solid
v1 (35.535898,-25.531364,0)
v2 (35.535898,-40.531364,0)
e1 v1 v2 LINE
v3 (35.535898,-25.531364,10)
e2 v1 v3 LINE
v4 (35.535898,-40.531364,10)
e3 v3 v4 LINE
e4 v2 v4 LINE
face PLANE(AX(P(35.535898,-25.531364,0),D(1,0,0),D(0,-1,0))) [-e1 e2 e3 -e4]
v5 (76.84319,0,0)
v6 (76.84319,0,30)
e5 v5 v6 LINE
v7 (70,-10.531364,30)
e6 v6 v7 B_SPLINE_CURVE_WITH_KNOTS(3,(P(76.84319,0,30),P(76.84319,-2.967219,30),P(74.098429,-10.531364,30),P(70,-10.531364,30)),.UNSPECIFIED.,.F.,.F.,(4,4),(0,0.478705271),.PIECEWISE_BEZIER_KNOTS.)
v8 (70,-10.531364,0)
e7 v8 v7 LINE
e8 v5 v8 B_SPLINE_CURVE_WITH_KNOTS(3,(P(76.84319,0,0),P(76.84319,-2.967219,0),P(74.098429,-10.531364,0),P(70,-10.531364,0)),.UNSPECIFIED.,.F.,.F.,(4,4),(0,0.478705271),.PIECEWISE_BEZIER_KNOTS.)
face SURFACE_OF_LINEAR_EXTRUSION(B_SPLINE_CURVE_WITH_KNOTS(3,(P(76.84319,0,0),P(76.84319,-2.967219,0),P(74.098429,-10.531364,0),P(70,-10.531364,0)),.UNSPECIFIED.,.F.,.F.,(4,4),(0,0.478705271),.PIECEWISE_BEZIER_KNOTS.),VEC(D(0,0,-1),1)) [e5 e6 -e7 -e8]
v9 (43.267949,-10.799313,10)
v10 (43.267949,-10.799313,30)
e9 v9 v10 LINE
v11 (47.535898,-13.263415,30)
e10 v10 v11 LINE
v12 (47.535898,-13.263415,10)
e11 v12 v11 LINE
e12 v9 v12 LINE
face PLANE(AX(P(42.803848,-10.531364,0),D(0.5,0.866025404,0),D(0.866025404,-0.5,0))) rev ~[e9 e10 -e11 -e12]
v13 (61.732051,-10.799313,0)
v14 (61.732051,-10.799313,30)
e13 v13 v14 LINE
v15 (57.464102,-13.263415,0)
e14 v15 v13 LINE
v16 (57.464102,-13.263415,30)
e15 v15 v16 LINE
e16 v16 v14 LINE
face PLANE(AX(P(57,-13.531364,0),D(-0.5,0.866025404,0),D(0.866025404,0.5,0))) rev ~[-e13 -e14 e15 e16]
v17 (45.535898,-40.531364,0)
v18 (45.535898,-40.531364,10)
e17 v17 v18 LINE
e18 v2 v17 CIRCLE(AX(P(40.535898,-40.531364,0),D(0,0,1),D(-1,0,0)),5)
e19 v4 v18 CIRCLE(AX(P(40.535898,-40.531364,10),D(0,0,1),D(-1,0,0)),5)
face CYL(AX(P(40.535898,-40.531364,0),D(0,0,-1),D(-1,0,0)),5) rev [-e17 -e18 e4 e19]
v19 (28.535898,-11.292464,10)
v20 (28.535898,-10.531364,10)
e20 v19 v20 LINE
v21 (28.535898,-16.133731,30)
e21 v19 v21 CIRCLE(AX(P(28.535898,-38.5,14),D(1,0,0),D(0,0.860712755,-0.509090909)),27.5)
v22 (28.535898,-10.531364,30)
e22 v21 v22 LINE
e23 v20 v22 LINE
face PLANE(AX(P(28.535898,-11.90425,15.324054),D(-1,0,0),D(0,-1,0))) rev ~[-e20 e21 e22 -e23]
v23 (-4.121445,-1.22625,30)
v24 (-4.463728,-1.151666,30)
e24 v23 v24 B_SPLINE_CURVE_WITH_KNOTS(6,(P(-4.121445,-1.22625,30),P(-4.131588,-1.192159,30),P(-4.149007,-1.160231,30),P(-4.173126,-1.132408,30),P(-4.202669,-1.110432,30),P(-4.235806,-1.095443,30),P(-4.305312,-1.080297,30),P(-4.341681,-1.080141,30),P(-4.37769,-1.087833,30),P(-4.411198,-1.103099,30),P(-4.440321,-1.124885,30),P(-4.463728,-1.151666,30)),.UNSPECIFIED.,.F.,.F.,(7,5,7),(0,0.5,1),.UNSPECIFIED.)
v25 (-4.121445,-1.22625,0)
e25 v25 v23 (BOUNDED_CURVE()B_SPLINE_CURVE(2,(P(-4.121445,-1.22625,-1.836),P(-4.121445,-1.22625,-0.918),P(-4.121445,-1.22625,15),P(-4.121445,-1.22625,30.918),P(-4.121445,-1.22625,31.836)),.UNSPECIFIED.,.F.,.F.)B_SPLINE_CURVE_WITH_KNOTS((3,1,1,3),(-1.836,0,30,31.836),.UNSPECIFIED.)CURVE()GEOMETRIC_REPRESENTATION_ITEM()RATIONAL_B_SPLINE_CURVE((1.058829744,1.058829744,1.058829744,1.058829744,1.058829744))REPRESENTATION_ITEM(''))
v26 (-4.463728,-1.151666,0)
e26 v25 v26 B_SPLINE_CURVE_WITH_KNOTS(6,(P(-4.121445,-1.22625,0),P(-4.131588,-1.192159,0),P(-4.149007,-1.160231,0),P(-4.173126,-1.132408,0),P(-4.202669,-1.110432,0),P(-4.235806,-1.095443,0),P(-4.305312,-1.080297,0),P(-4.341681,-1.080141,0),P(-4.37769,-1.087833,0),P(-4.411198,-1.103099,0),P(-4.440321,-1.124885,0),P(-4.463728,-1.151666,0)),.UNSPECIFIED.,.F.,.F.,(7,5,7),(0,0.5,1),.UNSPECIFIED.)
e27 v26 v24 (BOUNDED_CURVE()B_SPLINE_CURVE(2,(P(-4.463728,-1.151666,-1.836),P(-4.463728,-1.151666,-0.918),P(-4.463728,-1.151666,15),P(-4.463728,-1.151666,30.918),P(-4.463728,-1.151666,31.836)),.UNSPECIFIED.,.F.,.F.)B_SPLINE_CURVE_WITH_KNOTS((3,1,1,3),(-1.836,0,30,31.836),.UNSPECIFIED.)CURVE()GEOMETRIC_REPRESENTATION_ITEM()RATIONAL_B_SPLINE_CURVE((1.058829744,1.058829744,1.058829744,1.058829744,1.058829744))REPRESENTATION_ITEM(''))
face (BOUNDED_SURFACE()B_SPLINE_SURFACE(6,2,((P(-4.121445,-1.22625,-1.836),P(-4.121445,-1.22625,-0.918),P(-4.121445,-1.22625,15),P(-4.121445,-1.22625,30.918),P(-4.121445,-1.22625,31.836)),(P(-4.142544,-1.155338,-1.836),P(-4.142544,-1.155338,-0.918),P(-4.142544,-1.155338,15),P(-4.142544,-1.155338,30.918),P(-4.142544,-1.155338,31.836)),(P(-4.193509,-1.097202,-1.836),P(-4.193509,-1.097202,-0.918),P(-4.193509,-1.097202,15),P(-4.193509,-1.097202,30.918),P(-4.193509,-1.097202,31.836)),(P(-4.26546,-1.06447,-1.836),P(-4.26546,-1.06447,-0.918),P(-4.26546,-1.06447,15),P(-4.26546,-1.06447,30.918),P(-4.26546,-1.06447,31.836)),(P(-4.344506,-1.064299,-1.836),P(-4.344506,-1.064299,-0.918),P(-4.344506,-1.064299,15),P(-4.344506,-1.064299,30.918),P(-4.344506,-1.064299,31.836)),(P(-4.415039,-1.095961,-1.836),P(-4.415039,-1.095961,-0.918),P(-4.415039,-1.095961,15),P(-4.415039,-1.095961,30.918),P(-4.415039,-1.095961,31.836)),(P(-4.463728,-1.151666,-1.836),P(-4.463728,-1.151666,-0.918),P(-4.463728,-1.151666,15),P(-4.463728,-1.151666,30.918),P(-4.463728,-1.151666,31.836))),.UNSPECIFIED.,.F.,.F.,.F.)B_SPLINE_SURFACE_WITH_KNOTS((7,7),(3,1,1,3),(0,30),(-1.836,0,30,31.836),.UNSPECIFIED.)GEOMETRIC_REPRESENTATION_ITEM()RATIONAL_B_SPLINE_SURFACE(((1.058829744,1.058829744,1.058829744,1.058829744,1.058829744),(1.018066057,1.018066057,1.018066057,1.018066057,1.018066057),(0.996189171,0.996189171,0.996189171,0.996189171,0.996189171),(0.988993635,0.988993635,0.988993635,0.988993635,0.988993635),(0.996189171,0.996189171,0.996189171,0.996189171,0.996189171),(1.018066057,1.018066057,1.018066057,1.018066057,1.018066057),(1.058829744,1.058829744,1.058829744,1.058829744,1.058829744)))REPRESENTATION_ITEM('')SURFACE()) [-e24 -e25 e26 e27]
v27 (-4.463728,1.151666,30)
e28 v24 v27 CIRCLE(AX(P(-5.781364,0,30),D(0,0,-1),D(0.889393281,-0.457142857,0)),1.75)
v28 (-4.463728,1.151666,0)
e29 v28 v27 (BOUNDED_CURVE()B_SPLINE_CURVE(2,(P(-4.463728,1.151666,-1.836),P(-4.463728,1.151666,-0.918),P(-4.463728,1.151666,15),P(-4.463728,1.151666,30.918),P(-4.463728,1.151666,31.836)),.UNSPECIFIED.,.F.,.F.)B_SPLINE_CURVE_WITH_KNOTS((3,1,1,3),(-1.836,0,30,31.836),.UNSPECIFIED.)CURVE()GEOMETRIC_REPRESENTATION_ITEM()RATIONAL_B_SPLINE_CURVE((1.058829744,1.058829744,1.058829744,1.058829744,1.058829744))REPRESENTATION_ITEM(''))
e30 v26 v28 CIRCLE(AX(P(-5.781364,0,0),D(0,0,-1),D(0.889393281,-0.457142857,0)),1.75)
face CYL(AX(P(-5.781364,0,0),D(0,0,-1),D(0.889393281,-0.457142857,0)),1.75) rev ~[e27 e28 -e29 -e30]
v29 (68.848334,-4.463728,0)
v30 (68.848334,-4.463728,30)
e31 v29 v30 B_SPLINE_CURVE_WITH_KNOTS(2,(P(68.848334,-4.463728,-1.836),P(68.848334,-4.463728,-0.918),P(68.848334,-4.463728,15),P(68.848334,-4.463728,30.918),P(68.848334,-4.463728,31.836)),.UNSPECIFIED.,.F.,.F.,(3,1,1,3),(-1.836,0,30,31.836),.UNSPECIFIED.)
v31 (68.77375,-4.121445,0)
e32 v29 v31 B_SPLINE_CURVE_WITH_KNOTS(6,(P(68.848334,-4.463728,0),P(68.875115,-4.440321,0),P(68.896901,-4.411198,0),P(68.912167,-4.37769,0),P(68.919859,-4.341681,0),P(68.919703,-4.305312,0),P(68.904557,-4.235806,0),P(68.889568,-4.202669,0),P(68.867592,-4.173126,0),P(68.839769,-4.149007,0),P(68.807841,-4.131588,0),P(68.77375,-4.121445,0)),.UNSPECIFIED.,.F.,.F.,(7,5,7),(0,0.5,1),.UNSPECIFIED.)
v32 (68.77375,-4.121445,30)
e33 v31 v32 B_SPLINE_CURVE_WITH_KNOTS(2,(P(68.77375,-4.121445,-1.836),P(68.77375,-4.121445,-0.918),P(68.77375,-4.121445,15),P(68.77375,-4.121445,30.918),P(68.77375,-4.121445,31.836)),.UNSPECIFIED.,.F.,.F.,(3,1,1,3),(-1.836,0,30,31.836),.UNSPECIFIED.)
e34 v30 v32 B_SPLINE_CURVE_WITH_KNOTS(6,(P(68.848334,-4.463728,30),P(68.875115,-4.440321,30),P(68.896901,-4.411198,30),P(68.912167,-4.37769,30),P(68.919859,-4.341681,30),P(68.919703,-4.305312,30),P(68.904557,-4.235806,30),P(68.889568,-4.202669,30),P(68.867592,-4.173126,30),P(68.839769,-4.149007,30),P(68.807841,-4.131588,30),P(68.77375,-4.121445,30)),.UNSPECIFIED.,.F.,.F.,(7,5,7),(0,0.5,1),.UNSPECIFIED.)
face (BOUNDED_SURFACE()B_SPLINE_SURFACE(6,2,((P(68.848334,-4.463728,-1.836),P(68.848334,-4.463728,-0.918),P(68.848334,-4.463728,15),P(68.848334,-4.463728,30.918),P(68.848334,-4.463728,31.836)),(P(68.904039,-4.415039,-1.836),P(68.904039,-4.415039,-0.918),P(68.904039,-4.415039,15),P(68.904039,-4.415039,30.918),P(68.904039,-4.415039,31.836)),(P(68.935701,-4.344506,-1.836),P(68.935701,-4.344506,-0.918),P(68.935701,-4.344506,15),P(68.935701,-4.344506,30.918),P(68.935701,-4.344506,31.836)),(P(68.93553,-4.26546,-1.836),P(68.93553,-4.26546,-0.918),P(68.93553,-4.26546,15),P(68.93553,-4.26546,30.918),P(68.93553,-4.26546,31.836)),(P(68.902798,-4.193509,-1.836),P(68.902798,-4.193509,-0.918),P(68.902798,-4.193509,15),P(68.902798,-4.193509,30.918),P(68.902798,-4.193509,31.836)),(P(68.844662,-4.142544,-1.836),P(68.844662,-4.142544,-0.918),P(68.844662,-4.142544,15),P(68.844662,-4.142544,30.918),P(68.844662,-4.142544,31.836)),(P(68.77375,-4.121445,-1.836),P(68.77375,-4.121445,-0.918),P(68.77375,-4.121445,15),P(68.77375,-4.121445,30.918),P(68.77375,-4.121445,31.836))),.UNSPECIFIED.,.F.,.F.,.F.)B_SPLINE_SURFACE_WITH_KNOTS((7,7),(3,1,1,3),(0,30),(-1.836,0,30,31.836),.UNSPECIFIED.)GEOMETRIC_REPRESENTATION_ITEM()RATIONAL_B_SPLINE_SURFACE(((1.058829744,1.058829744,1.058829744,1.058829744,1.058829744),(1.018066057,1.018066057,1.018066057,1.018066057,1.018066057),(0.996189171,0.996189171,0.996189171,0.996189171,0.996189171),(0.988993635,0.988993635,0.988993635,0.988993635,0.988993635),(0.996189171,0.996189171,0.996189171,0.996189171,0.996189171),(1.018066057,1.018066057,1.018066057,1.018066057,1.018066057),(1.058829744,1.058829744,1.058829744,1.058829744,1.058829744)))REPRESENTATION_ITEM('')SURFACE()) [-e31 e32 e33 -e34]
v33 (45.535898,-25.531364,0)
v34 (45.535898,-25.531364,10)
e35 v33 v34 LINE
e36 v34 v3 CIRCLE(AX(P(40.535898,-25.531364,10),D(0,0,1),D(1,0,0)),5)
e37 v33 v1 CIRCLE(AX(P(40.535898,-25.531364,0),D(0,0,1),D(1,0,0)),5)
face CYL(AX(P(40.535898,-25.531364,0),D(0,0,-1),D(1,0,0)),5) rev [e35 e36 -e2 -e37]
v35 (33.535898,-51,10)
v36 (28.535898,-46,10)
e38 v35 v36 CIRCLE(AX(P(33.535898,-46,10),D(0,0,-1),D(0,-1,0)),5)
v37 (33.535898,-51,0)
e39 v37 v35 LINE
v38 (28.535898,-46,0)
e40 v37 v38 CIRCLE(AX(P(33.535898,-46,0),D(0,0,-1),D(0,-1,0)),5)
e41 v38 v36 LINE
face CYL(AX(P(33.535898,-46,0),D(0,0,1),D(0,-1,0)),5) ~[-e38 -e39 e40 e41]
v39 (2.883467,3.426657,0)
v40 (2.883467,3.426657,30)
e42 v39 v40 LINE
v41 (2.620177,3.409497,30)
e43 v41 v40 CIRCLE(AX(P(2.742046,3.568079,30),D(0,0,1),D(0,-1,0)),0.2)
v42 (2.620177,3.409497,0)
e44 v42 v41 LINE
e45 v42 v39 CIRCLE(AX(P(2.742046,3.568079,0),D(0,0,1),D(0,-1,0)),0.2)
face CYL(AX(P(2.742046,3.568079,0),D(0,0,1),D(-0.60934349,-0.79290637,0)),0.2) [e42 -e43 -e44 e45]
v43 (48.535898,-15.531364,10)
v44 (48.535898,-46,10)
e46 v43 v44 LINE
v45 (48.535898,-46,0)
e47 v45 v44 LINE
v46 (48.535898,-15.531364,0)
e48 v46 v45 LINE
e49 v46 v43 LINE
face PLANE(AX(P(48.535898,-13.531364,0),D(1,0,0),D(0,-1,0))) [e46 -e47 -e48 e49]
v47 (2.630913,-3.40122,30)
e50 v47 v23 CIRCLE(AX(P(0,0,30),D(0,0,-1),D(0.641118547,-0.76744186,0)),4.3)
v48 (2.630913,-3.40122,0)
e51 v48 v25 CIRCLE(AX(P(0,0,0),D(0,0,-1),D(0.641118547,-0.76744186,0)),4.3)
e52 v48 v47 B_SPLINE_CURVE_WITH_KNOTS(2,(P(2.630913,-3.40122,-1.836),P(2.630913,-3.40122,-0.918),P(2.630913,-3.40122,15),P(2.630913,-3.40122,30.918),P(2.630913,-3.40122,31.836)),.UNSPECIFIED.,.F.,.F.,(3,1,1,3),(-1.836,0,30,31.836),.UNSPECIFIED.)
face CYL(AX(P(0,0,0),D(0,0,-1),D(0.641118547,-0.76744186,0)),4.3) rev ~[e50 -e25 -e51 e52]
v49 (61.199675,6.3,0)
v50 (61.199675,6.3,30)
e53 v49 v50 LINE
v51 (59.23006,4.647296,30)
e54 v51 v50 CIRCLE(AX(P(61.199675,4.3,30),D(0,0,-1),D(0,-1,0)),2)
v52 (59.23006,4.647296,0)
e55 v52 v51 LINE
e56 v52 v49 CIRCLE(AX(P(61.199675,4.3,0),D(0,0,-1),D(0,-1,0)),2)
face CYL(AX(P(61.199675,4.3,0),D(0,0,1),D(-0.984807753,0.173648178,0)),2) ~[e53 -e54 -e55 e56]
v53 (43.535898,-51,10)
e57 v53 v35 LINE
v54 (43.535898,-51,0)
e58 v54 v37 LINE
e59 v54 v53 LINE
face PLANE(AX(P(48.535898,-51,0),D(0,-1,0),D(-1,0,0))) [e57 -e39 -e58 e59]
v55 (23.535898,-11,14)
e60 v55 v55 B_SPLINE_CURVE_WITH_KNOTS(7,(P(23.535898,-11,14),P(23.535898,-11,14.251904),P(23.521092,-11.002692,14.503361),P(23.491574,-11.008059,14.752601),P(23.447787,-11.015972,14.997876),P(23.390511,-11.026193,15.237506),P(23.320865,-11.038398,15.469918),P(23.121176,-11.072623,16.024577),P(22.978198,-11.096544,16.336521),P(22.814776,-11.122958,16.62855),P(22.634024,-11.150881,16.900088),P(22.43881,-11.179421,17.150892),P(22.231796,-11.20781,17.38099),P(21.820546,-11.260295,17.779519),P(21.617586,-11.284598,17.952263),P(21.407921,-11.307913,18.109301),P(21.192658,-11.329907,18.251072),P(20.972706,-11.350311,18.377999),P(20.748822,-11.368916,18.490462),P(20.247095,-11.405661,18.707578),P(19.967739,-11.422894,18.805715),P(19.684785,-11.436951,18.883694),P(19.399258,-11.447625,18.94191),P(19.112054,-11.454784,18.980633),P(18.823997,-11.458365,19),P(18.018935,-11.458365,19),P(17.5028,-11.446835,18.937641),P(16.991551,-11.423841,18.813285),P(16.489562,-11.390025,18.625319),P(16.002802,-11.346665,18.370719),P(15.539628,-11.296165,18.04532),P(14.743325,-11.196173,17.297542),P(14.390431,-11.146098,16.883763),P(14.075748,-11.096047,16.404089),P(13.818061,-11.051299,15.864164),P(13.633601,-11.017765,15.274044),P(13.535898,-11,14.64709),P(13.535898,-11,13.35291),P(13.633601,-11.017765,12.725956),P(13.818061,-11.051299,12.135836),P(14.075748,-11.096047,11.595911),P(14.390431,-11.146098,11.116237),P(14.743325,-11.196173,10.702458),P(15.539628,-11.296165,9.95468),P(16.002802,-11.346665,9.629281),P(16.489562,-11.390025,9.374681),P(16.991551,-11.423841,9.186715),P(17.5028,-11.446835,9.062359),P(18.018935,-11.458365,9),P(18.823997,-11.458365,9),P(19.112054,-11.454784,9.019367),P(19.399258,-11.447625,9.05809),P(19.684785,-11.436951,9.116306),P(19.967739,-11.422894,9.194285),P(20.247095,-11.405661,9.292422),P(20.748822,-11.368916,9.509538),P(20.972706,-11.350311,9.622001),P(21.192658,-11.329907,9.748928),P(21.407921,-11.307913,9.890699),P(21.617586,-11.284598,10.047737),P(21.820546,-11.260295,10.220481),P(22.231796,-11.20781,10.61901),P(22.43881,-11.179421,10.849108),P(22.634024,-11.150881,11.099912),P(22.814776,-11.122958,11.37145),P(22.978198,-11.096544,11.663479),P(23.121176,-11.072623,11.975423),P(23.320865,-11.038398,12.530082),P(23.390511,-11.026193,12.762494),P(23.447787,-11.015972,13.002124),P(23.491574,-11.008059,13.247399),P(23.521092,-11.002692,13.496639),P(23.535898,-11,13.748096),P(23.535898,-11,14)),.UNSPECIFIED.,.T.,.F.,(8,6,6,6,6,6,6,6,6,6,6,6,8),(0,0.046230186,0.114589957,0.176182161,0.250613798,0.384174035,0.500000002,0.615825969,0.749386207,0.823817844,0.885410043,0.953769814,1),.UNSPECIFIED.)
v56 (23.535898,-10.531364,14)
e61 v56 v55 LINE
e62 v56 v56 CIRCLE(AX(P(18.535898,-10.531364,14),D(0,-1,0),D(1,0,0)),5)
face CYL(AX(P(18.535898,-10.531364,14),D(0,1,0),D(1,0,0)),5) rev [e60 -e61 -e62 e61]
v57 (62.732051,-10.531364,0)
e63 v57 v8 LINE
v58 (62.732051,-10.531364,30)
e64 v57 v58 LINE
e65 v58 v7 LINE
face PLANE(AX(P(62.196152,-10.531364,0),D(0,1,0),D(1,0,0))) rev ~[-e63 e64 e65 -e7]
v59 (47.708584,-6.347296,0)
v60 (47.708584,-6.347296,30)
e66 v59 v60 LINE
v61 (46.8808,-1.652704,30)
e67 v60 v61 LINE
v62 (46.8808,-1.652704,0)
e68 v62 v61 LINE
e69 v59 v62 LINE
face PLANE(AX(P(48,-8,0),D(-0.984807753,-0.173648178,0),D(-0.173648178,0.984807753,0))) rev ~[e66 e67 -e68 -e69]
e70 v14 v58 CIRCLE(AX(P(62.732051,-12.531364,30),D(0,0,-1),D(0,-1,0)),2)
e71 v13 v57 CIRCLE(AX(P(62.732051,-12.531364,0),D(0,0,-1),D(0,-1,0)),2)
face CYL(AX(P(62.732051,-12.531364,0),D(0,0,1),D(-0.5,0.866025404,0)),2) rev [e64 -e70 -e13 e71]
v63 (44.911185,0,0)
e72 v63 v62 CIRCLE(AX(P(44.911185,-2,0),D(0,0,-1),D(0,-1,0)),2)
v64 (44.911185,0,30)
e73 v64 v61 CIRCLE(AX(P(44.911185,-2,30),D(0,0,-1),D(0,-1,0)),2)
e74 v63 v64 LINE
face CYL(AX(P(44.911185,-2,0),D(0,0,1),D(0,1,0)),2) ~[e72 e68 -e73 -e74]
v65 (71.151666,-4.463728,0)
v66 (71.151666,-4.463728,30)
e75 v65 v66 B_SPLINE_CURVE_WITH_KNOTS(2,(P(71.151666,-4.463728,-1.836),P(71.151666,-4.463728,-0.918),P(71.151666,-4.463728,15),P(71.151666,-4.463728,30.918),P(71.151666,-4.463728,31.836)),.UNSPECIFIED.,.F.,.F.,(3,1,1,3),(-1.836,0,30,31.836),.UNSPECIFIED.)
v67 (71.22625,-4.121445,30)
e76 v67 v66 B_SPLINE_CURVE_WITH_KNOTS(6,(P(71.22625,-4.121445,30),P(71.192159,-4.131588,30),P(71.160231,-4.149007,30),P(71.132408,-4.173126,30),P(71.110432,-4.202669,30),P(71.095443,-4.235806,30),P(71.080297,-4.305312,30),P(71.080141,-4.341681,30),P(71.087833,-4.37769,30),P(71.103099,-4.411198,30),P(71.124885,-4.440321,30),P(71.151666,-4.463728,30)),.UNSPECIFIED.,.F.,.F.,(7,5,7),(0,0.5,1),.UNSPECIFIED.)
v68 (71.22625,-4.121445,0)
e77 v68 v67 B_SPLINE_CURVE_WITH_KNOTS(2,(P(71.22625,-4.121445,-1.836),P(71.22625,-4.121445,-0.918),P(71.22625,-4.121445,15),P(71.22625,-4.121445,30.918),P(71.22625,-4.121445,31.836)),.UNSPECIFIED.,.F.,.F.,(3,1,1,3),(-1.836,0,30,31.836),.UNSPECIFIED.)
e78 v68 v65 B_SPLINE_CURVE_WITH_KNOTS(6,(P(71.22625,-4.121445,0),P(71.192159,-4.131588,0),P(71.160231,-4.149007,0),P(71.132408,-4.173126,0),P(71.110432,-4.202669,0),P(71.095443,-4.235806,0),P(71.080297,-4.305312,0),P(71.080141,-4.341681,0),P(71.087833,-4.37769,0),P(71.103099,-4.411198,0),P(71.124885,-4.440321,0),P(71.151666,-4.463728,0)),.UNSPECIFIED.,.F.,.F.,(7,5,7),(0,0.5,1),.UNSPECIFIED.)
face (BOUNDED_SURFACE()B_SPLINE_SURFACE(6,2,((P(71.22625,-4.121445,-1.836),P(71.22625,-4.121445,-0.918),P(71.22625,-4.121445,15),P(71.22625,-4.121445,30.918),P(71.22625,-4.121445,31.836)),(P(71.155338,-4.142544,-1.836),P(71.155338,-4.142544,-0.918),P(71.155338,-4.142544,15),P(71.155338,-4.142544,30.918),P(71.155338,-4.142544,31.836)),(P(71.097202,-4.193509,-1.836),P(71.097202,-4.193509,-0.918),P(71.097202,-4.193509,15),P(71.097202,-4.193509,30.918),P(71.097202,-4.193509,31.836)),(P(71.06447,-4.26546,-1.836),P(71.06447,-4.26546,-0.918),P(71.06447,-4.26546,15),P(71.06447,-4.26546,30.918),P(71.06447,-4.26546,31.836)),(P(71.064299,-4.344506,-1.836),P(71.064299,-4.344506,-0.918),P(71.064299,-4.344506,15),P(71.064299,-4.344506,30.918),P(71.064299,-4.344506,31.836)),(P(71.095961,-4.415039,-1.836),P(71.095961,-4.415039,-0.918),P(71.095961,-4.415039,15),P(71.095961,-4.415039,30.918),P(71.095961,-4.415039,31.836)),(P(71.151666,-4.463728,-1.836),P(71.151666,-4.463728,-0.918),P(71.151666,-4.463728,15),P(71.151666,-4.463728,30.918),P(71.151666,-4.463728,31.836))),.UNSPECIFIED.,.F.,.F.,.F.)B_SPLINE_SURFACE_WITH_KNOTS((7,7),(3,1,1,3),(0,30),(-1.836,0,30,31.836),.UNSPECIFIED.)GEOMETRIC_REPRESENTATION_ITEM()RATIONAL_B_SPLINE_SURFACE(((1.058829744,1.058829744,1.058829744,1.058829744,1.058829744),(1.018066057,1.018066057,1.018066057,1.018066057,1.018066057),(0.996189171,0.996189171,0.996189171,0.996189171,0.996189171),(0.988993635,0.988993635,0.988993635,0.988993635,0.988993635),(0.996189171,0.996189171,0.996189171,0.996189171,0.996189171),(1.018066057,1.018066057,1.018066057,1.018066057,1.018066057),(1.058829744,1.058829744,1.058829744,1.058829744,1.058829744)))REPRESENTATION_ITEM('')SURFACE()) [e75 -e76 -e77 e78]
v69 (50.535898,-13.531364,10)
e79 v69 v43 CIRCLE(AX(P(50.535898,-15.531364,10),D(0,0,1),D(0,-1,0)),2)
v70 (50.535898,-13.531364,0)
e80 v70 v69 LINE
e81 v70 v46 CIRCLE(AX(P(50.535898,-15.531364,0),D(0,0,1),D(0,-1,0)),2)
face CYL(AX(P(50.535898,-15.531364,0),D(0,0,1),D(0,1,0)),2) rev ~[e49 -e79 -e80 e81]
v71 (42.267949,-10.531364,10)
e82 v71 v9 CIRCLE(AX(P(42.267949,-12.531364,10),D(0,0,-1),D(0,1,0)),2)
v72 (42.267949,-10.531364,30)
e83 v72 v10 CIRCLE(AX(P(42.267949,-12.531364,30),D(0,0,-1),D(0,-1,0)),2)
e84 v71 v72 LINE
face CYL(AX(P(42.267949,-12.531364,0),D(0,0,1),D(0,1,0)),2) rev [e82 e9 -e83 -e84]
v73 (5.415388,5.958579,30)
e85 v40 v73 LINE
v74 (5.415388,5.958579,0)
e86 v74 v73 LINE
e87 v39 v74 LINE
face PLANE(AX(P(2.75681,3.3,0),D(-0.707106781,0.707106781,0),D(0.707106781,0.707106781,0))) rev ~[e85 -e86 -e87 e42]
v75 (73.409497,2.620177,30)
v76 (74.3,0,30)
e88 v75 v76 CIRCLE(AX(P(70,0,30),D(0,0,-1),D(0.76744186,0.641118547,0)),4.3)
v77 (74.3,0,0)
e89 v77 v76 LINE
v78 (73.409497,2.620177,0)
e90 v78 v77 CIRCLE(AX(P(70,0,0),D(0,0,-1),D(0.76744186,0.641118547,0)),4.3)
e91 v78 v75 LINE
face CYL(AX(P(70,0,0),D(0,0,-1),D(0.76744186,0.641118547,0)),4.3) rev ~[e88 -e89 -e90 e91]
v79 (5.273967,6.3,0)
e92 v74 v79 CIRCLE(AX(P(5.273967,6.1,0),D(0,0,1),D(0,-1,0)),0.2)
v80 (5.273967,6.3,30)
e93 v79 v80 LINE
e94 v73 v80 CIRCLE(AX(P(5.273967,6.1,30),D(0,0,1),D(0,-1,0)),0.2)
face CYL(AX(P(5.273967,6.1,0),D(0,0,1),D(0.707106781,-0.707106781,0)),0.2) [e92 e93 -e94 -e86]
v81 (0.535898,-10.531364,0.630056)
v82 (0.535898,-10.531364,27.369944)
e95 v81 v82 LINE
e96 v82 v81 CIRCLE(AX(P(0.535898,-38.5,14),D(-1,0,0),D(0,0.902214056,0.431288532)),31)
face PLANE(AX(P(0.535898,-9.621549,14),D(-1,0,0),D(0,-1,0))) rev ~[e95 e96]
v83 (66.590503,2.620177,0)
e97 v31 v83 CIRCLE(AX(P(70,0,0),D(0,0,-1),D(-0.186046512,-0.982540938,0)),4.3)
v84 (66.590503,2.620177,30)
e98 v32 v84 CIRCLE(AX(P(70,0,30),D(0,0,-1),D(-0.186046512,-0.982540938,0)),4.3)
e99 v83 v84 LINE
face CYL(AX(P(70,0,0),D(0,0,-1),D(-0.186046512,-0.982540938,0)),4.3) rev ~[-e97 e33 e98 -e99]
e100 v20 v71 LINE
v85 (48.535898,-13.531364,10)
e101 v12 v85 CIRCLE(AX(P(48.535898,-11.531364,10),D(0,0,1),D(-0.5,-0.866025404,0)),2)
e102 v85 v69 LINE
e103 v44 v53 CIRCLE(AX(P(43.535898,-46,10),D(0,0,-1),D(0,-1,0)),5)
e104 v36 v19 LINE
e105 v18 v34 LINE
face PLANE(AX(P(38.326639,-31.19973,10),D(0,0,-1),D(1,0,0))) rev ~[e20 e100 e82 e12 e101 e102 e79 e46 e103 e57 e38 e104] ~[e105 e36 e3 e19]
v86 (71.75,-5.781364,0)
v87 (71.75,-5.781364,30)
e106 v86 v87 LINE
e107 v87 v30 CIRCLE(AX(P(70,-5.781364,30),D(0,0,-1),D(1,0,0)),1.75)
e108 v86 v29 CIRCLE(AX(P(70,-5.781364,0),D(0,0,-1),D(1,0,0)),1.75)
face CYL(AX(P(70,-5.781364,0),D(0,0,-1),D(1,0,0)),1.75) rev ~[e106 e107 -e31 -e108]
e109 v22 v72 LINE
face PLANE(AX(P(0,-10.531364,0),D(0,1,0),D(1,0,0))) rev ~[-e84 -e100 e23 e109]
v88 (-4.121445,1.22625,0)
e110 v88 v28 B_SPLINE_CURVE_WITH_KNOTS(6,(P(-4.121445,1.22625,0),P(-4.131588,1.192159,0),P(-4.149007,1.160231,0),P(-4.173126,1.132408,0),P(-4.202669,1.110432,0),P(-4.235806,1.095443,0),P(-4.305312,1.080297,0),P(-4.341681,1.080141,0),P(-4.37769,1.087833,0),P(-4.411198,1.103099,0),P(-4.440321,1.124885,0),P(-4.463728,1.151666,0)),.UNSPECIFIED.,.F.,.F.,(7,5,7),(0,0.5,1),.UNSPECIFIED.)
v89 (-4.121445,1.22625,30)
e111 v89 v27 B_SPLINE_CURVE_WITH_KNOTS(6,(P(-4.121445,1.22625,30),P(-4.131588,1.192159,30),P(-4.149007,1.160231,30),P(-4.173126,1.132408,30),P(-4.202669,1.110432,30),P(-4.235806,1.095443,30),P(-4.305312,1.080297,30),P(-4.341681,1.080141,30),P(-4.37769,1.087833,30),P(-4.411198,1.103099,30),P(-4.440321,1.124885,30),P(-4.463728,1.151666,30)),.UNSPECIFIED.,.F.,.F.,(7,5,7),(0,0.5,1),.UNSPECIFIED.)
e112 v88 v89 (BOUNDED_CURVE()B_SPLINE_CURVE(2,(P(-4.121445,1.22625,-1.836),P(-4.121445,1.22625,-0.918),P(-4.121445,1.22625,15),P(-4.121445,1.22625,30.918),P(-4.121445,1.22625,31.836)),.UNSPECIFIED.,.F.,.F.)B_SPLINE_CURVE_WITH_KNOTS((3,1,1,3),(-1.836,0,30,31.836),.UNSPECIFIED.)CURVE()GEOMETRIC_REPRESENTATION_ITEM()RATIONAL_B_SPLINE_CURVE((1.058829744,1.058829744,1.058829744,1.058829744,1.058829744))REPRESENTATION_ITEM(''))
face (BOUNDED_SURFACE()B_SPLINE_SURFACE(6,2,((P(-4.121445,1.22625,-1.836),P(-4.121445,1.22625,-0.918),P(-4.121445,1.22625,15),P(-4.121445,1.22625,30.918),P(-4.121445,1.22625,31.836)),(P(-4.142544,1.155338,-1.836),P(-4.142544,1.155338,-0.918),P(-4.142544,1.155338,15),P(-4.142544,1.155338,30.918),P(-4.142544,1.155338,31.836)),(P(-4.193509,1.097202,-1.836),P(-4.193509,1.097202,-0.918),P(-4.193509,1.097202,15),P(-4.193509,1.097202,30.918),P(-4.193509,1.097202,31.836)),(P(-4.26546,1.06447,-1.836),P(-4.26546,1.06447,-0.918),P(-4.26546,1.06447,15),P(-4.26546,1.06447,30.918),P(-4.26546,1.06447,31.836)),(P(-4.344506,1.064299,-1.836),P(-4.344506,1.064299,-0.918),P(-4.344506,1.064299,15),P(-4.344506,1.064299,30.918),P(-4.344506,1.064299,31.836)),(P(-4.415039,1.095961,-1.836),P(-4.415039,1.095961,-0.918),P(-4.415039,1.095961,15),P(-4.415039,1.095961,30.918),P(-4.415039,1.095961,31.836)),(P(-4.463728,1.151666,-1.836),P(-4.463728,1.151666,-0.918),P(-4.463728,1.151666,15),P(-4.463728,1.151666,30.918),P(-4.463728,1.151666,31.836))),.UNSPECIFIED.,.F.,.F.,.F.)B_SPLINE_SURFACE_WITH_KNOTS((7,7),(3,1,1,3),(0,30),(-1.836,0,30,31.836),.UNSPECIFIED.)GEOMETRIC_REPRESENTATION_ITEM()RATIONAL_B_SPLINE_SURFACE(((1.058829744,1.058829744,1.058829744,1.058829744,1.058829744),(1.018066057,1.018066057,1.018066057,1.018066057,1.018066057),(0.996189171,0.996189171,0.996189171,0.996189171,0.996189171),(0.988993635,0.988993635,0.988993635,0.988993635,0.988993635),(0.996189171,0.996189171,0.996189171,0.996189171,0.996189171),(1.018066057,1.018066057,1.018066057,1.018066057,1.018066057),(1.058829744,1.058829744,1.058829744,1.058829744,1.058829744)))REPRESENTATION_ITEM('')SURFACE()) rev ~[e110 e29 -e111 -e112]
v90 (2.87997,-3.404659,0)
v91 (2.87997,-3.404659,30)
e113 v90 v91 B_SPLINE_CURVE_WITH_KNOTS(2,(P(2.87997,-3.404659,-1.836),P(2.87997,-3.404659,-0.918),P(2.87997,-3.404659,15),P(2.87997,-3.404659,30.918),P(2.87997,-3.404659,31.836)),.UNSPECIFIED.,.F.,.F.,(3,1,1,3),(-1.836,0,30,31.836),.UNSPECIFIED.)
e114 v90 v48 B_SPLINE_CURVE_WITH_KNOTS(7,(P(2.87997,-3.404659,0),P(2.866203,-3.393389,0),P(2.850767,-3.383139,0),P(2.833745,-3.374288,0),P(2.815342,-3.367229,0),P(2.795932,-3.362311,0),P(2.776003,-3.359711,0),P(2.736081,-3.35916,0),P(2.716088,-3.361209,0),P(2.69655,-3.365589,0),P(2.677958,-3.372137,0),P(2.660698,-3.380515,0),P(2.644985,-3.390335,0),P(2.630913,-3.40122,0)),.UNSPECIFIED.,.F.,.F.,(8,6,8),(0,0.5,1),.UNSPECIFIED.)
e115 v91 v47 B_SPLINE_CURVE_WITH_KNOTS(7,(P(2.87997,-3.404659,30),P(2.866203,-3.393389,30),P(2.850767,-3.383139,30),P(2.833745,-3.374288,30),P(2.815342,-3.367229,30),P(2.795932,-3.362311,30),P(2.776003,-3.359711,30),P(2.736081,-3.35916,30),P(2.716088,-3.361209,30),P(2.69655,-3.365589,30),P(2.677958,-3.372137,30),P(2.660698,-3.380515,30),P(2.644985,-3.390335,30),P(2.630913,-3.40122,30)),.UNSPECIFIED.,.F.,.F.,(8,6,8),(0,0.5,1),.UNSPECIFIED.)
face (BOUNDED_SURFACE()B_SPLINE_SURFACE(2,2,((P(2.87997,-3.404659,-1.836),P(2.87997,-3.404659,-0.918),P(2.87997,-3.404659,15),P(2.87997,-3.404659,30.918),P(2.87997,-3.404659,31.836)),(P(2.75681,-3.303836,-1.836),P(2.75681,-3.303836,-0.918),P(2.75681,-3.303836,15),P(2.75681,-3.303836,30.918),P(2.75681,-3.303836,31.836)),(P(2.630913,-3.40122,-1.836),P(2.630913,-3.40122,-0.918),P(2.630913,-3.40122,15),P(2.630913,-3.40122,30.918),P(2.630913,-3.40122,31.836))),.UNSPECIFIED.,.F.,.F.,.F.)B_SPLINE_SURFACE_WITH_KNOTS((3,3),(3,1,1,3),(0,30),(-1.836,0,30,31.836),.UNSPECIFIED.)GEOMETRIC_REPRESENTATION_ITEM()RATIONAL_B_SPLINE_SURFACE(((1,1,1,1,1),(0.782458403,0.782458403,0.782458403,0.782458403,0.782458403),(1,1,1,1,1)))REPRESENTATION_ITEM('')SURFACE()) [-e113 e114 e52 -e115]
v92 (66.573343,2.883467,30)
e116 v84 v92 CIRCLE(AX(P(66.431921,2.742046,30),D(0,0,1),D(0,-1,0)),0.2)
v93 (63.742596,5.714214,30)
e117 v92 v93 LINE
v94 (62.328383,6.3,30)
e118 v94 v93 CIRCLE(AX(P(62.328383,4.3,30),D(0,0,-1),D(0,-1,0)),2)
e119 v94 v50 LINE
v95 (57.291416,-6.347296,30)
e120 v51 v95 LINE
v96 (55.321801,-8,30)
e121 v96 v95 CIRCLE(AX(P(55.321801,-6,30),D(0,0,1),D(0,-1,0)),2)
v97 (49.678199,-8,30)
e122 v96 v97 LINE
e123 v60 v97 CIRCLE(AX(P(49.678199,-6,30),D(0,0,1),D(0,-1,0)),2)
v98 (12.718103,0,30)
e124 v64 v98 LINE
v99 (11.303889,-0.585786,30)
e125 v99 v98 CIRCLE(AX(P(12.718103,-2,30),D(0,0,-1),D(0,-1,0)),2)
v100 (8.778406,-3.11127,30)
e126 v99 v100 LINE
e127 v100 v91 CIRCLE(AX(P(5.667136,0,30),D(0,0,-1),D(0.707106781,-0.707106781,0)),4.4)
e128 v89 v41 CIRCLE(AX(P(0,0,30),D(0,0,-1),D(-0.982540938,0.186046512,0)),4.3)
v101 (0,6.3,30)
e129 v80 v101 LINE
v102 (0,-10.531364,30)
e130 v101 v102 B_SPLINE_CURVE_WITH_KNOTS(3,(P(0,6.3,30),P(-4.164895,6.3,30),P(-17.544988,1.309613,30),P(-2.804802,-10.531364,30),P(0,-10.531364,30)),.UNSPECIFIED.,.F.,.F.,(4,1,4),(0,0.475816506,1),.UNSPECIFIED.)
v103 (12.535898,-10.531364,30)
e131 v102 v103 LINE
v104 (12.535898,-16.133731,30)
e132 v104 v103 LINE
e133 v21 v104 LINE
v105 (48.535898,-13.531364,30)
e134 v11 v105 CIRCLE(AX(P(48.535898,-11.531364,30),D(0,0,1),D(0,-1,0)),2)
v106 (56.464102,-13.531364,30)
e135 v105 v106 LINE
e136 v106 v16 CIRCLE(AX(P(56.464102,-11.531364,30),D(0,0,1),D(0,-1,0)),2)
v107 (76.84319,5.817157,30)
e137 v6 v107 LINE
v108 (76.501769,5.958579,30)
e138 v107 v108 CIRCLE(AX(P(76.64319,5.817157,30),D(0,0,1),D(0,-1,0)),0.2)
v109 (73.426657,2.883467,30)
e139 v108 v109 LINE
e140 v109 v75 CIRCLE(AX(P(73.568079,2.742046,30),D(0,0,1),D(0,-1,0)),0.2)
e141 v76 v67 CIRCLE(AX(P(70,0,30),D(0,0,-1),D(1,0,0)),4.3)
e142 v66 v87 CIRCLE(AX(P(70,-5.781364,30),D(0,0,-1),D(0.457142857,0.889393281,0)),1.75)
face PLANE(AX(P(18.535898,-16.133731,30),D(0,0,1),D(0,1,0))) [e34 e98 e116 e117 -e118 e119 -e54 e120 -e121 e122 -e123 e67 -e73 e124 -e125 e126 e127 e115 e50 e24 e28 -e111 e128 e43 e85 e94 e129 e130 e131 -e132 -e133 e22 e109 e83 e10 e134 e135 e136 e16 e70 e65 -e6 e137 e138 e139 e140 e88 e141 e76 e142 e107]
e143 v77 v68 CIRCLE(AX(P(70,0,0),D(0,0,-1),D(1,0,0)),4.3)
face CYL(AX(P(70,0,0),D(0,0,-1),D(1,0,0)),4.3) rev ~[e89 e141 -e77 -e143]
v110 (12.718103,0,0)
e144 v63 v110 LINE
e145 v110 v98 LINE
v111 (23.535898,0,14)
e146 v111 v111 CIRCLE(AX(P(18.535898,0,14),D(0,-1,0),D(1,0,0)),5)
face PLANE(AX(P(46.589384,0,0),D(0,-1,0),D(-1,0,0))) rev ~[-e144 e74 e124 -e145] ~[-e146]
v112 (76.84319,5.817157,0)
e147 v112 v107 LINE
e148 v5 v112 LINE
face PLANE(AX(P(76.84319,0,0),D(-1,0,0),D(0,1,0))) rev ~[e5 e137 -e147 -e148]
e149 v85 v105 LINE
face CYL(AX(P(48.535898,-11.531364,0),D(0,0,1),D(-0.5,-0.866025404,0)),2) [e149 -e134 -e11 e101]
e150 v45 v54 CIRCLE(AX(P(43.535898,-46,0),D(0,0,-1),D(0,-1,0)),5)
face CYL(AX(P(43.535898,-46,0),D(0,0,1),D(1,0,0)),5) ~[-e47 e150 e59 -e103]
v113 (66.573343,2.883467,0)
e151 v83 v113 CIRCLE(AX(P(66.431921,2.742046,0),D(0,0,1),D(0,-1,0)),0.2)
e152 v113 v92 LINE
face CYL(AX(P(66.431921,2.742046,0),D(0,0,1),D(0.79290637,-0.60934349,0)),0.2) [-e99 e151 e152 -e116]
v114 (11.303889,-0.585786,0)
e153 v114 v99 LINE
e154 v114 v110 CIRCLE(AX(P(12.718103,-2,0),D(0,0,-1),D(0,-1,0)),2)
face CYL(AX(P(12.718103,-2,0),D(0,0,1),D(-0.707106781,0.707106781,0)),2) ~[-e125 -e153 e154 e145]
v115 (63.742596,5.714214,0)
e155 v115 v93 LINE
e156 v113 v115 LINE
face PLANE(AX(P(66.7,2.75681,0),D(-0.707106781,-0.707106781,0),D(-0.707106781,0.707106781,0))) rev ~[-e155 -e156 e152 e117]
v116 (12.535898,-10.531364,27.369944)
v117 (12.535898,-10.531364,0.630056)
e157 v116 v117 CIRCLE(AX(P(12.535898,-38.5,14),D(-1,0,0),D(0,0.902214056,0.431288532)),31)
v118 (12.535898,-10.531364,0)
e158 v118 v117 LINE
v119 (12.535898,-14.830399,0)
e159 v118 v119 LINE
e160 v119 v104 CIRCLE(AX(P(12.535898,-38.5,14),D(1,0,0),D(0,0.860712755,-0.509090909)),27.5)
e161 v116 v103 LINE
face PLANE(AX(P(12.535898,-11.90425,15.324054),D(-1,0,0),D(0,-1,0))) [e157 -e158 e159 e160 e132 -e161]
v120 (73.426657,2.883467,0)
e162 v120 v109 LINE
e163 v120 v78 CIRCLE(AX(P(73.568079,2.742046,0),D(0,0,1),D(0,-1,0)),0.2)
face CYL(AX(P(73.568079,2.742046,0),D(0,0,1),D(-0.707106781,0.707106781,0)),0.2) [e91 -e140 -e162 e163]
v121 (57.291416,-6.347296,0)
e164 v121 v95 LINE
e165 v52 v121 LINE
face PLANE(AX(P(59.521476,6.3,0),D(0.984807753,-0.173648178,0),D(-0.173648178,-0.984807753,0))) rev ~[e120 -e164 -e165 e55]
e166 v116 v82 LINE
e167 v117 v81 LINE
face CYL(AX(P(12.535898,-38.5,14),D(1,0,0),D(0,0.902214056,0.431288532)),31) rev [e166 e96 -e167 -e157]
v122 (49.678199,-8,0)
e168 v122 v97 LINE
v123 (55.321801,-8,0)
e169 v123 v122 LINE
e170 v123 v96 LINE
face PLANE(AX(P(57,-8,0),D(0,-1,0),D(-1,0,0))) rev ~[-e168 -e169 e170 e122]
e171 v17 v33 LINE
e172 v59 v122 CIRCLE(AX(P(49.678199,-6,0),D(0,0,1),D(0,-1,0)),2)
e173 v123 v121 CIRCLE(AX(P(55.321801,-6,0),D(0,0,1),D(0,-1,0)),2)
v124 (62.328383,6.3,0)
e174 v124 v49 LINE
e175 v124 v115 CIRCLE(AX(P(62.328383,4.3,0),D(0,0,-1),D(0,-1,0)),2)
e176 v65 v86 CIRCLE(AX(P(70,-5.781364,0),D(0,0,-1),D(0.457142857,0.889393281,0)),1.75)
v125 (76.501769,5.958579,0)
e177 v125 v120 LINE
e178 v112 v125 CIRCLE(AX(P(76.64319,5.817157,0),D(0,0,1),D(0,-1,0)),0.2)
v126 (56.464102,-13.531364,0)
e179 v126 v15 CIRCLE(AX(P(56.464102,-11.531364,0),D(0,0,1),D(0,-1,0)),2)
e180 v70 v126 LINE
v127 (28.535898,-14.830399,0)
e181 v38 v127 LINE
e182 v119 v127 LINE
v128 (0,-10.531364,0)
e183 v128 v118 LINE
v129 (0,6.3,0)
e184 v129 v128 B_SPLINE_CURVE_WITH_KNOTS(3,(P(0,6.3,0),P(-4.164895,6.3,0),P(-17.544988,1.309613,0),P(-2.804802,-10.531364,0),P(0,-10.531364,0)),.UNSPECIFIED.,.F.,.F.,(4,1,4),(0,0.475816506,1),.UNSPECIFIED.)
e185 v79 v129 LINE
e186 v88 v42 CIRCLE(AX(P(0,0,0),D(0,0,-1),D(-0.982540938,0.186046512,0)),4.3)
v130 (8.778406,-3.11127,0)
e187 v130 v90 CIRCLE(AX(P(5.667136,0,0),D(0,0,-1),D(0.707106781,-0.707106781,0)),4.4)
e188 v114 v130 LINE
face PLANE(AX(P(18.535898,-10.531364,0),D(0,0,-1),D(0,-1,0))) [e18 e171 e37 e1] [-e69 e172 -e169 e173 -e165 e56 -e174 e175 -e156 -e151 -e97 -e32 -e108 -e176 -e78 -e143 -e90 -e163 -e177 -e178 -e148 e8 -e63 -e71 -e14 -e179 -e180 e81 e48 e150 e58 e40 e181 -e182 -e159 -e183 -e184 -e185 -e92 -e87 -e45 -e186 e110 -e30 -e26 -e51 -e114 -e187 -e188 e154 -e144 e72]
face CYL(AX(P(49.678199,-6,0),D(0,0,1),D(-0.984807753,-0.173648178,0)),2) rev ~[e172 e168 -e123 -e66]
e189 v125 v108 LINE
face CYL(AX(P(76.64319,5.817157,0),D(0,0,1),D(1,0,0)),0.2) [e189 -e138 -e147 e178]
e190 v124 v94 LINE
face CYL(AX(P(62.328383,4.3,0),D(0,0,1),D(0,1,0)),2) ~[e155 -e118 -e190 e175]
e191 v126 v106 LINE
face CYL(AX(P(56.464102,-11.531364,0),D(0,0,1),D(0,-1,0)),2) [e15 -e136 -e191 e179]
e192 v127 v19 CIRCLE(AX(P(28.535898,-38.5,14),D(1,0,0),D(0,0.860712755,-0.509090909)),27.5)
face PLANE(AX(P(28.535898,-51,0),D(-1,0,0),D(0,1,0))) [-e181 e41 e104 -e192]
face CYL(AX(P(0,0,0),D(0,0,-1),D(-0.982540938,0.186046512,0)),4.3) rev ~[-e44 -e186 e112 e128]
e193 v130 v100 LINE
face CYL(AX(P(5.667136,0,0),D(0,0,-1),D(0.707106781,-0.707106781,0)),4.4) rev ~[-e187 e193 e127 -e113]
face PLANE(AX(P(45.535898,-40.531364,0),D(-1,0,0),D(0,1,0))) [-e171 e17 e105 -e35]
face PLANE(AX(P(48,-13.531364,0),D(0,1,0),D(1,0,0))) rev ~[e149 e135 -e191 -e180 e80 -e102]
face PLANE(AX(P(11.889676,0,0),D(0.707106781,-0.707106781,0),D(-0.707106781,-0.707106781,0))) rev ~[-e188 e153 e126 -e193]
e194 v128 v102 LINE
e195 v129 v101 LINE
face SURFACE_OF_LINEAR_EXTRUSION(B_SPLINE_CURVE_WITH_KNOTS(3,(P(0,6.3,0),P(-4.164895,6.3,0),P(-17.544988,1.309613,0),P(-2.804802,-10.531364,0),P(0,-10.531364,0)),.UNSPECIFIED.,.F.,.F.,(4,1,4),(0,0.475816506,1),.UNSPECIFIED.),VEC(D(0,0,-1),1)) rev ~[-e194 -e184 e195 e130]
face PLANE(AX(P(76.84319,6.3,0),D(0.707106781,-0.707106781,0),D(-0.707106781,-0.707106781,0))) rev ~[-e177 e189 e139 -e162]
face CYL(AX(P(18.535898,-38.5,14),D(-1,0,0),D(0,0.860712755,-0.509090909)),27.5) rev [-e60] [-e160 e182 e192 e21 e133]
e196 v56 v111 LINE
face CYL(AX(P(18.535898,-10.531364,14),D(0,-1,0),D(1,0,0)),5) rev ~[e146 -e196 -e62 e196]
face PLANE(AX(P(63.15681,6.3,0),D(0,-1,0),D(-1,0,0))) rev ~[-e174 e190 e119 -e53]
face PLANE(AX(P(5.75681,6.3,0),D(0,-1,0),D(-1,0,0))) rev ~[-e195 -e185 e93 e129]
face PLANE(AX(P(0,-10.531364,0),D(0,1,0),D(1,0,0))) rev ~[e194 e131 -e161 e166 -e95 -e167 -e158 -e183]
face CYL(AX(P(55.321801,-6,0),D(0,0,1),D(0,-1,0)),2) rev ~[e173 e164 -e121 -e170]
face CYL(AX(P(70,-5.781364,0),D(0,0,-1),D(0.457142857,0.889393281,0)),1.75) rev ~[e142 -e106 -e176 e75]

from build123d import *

# Parameters (mm, degrees)
F1_DEPTH       = 30
F2_R           = 0.2
F3_R           = 2
F5_DEPTH       = 10
F8_DEPTH       = 6
F8_DEPTH_BACK  = 10
F10_DEPTH      = 12
F11_R          = 5
F12_DEPTH      = 40.4696358235
F12_DEPTH_BACK = 16.8323643765
F13_R          = 2
F14_R          = 5


# Not quite as in the source:
# - ends of sketch curves that miss each other by under 0.0002 mm in the source are joined


with BuildPart() as f1:
    # F0 (on Top) → F1 (new body)
    with BuildSketch(Plane.XY):
        with BuildLine():
            ThreePointArc((-4.2249260349, 0.8), (-1.4496004126, 4.0482908299), (2.7568097504, 3.3))
            Line((2.7568097504, 3.3), (5.7568097504, 6.3))
            Line((5.7568097504, 6.3), (0, 6.3))
            add(Edge.make_bspline(
                [(0, 6.3), (-4.1648952214, 6.3), (-17.5449881237, 1.3096127619), (-2.8048020259, -10.5313642765), (0, -10.5313642765)],
                knots=[0, 0, 0, 0, 0.475816506, 1, 1, 1, 1], degree=3))
            Line((0, -10.5313642765), (42.8038475773, -10.5313642765))
            Line((42.8038475773, -10.5313642765), (62.1961524227, -10.5313642765))
            Line((62.1961524227, -10.5313642765), (70, -10.5313642765))
            add(Edge.make_bspline(
                [(76.8431902496, 0), (76.8431902496, -2.967218801), (74.0984288633, -10.5313642765), (70, -10.5313642765)],
                knots=[0, 0, 0, 0, 0.4787052711, 0.4787052711, 0.4787052711, 0.4787052711], degree=3))
            Line((76.8431902496, 0), (76.8431902496, 6.3))
            Line((76.8431902496, 6.3), (73.3, 2.7568097504))
            ThreePointArc((73.3, 2.7568097504), (74.0422765863, 1.4662878299), (74.3, 0))
            ThreePointArc((74.3, 0), (73.311344138, -2.7431733449), (70.8, -4.2249260349))
            ThreePointArc((70.8, -4.2249260349), (71.4937369246, -4.86963515), (71.75, -5.7813642765))
            ThreePointArc((71.75, -5.7813642765), (69.0882708736, -7.2751012011), (69.2, -4.2249260349))
            ThreePointArc((69.2, -4.2249260349), (65.9517091701, -1.4496004126), (66.7, 2.7568097504))
            Line((66.7, 2.7568097504), (63.1568097504, 6.3))
            Line((63.1568097504, 6.3), (59.5214758241, 6.3))
            Line((59.5214758241, 6.3), (57, -8))
            Line((57, -8), (48, -8))
            Line((48, -8), (46.5893841543, 0))
            Line((46.5893841543, 0), (11.889675867, 0))
            Line((11.889675867, 0), (8.7784060298, -3.1112698372))
            ThreePointArc((8.7784060298, -3.1112698372), (5.8049742519, -4.3978404552), (2.7568097504, -3.3))
            ThreePointArc((2.7568097504, -3.3), (-1.4496004126, -4.0482908299), (-4.2249260349, -0.8))
            ThreePointArc((-4.2249260349, -0.8), (-7.5313642765, 0), (-4.2249260349, 0.8))
        make_face()
        Polygon((62.1961524227, -10.5313642765), (42.8038475773, -10.5313642765), (48, -13.5313642765), (57, -13.5313642765), align=None)
    extrude(amount=F1_DEPTH)

    # F2
    f2_edges = [f1.edges().sort_by_distance(p)[0] for p in [
        (5.75681, 6.3, 15),
        (2.75681, 3.3, 15),
        (-4.224926, 0.8, 15),
        (-4.224926, -0.8, 15),
        (2.75681, -3.3, 15),
        (76.84319, 6.3, 15),
        (66.7, 2.75681, 15),
        (69.2, -4.224926, 15),
        (70.8, -4.224926, 15),
        (73.3, 2.75681, 15),
    ]]
    fillet(f2_edges, radius=F2_R)

    # F3
    f3_edges = [f1.edges().sort_by_distance(p)[0] for p in [
        (63.15681, 6.3, 15),
        (48, -8, 15),
        (59.521476, 6.3, 15),
        (46.589384, 0, 15),
        (57, -8, 15),
        (11.889676, 0, 15),
        (42.803848, -10.531364, 15),
        (48, -13.531364, 15),
        (57, -13.531364, 15),
        (62.196152, -10.531364, 15),
    ]]
    fillet(f3_edges, radius=F3_R)

    # F4 (on face) → F5 (join)
    with BuildSketch(Plane(origin=(0, 0, 0), x_dir=(1, 0, 0), z_dir=(0, 0, -1))):
        with BuildLine():
            Line((28.5358983849, 51), (28.5358983849, 10.5313642765))
            Line((28.5358983849, 10.5313642765), (42.2679491924, 10.5313642765))
            ThreePointArc((42.2679491924, 10.5313642765), (42.7855872826, 10.5995126239), (43.2679491924, 10.7993134689))
            Line((43.2679491924, 10.7993134689), (47.5358983849, 13.2634150841))
            ThreePointArc((47.5358983849, 13.2634150841), (48.0182602947, 13.4632159291), (48.5358983849, 13.5313642765))
            Line((48.5358983849, 13.5313642765), (48.5358983849, 51))
            Line((48.5358983849, 51), (28.5358983849, 51))
        make_face()
        with BuildLine():
            ThreePointArc((35.5358983849, 40.5313642765), (40.5358983849, 45.5313642765), (45.5358983849, 40.5313642765))
            Line((45.5358983849, 40.5313642765), (45.5358983849, 25.5313642765))
            ThreePointArc((45.5358983849, 25.5313642765), (40.5358983849, 20.5313642765), (35.5358983849, 25.5313642765))
            Line((35.5358983849, 25.5313642765), (35.5358983849, 40.5313642765))
        make_face(mode=Mode.SUBTRACT)
    extrude(amount=-F5_DEPTH)

    # F7 (on offset) → F8 (join, two sides)
    with BuildSketch(Plane(origin=(18.5358983849, 0, 0), x_dir=(0, -1, 0), z_dir=(-1, 0, 0))) as f8_sk:
        with BuildLine():
            ThreePointArc((14.8303992429, 0), (11.0259152701, 15.1935946786), (16.1337307537, 30))
            Line((16.1337307537, 30), (10.5313622104, 30))
            Line((10.5313622104, 30), (10.5313642765, 0))
            Line((10.5313642765, 0), (14.8303992429, 0))
        make_face()
    extrude(amount=F8_DEPTH)
    extrude(f8_sk.sketch, amount=-F8_DEPTH_BACK)

    # F9 (on face) → F10 (cut)
    with BuildSketch(Plane(origin=(12.5358983849, 0, 0), x_dir=(0, -1, 0), z_dir=(-1, 0, 0))):
        with BuildLine():
            Line((10.5313642765, 0.6300555063), (10.5313642765, 27.3699444937))
            ThreePointArc((10.5313642765, 27.3699444937), (7.5, 14), (10.5313642765, 0.6300555063))
        make_face()
    extrude(amount=F10_DEPTH, mode=Mode.SUBTRACT)

    # F11 (on face) → F12 (cut, two sides)
    with BuildSketch(Plane.XZ.offset(10.5313642765)) as f12_sk:
        with Locations((18.5358983849, 14)):
            Circle(F11_R)
    extrude(amount=F12_DEPTH, mode=Mode.SUBTRACT)
    extrude(f12_sk.sketch, amount=-F12_DEPTH_BACK, mode=Mode.SUBTRACT)

    # F13
    f13_edges = [f1.edges().sort_by_distance(p)[0] for p in [
        (48.535898, -13.531364, 5),
        (48.535898, -13.531364, 20),
    ]]
    fillet(f13_edges, radius=F13_R)

    # F14
    f14_edges = [f1.edges().sort_by_distance(p)[0] for p in [
        (28.535898, -51, 5),
        (48.535898, -51, 5),
    ]]
    fillet(f14_edges, radius=F14_R)


solid = f1.part
